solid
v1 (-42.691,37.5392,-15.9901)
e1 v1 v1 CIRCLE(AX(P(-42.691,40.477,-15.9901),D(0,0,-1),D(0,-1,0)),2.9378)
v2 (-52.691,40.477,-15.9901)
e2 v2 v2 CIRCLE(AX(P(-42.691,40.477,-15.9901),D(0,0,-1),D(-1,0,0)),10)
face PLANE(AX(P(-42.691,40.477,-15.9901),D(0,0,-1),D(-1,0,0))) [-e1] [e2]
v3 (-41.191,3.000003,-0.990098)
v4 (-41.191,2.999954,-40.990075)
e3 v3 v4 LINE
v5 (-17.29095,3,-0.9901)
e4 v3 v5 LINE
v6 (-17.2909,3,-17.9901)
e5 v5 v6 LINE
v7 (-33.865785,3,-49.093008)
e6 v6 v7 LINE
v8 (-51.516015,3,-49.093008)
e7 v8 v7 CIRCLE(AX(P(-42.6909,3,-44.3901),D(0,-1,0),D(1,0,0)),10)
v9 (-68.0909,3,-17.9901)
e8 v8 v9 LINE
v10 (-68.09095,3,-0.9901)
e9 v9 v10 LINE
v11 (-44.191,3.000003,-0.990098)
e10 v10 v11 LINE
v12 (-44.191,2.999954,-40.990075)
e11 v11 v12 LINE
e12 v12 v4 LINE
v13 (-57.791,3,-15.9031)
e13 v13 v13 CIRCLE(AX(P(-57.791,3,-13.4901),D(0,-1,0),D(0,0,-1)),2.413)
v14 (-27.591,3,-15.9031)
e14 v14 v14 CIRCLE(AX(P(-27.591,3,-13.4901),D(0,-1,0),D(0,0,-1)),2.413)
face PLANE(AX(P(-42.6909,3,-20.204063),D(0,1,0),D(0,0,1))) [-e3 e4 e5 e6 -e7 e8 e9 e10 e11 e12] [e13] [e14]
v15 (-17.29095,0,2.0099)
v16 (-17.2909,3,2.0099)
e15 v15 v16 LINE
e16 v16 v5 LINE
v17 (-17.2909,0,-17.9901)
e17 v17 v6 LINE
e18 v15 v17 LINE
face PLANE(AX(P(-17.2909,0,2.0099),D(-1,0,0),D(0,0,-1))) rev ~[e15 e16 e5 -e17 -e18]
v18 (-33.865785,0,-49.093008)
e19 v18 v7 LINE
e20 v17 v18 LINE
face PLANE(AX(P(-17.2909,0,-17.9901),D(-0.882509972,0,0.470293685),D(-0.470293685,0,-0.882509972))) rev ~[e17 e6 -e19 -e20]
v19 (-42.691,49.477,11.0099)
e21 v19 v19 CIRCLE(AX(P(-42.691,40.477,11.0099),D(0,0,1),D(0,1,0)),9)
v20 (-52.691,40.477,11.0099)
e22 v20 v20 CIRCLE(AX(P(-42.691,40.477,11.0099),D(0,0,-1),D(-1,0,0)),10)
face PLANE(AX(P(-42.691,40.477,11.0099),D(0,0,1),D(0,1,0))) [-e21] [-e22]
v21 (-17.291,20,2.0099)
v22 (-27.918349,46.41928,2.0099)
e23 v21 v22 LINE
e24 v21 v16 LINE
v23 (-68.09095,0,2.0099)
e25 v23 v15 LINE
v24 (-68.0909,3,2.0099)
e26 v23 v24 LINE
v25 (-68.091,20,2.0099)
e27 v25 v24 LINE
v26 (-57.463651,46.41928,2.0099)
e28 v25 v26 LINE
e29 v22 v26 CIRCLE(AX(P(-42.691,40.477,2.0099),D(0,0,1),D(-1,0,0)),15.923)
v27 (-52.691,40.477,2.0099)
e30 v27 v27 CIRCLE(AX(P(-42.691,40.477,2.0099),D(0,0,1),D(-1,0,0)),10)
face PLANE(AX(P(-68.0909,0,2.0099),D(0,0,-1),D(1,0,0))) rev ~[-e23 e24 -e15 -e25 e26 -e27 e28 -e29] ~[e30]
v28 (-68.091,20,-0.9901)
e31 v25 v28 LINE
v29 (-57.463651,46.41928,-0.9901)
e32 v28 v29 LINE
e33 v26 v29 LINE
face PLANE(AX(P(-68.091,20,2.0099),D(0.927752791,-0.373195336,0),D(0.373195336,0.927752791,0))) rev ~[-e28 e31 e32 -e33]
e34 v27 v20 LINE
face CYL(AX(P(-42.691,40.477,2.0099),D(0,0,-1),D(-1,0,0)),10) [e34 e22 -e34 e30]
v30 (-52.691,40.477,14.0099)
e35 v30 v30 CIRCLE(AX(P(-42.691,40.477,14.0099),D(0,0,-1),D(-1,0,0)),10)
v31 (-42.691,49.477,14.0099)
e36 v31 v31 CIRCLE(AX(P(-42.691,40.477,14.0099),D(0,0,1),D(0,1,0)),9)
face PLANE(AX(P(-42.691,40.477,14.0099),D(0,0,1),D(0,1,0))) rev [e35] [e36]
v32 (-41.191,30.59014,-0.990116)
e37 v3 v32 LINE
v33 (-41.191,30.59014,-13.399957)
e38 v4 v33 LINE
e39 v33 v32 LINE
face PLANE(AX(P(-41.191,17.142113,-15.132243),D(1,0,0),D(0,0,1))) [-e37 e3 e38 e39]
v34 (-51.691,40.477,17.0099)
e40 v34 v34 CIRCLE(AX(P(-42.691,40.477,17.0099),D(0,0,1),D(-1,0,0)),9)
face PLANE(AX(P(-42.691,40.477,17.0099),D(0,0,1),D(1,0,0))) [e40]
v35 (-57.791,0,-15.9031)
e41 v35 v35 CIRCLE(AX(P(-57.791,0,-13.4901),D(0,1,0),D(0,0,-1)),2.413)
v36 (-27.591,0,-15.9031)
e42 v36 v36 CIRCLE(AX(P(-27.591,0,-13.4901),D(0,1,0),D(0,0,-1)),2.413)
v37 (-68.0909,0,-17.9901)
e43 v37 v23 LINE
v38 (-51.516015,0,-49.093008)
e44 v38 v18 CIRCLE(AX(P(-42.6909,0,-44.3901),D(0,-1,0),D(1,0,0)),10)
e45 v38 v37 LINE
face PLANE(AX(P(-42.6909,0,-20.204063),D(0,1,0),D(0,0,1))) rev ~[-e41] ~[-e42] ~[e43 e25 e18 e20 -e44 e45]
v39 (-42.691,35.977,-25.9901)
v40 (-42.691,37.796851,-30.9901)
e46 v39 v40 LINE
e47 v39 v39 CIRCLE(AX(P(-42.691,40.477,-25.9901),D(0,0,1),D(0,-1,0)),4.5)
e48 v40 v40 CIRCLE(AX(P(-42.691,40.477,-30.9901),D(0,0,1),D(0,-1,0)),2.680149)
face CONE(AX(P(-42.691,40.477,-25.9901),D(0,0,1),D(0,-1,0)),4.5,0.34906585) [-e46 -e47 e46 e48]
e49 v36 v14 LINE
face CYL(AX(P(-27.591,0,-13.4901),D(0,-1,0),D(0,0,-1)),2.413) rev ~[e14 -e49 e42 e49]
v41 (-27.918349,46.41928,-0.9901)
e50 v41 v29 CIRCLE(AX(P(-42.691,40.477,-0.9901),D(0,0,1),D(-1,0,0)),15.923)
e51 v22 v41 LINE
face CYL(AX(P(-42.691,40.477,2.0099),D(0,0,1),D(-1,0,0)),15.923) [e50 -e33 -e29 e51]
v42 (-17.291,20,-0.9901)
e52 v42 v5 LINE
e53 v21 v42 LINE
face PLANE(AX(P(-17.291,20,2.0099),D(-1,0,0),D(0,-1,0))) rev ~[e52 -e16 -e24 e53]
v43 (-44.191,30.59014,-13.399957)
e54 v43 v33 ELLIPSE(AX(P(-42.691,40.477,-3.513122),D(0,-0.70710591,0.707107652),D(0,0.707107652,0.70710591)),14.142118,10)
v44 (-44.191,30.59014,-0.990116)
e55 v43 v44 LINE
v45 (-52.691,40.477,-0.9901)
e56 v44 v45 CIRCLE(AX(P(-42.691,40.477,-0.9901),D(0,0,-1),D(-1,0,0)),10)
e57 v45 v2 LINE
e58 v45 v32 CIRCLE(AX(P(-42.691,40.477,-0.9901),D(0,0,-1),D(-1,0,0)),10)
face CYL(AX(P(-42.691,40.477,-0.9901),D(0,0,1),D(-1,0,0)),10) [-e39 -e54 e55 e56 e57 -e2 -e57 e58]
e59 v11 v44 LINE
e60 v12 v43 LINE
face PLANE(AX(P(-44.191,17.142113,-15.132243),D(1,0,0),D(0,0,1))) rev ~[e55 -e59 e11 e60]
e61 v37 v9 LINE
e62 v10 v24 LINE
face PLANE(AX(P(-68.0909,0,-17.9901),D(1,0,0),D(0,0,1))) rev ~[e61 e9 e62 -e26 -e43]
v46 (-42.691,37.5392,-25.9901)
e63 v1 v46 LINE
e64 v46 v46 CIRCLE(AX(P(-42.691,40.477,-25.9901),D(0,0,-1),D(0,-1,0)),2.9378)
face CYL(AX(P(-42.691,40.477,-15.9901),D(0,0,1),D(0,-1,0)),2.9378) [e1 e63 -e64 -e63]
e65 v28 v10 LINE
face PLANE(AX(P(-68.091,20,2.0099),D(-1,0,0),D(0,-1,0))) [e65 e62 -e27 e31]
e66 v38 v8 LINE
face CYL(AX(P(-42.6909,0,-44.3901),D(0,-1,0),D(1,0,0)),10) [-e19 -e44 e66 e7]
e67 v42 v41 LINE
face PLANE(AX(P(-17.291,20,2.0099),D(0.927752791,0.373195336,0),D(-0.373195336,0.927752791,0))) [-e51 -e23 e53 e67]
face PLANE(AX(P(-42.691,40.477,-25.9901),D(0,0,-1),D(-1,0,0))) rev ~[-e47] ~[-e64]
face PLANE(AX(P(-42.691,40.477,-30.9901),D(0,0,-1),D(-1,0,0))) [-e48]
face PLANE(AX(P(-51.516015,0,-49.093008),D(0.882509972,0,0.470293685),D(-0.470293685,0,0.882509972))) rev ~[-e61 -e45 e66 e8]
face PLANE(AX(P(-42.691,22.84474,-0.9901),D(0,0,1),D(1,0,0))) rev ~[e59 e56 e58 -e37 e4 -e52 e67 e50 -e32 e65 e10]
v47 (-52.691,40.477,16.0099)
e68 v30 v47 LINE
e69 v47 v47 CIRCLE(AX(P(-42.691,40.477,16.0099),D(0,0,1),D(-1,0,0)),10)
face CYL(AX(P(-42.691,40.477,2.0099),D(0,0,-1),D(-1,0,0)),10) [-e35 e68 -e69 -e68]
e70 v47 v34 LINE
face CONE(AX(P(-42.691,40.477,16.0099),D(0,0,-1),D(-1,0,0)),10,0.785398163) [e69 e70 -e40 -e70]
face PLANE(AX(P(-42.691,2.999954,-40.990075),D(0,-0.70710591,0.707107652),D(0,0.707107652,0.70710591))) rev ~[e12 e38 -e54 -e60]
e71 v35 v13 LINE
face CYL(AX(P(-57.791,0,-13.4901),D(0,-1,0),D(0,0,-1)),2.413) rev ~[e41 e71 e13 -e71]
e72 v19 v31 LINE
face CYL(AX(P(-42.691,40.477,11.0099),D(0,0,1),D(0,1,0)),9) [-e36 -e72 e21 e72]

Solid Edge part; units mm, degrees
sketch "Sketch1" plane through (10.8674, 0, 10.8674) normal (0, -1, 0) x (1, 0, 0)
  line L0 (-78.9583, -8.8575) -> (-28.1583, -8.8575)
  line L1 (-28.1583, -8.8575) -> (-28.1583, -28.8575)
  line L2 (-28.1583, -28.8575) -> (-44.7332, -59.9604)
  arc A0 (-62.3834, -59.9604) -> (-44.7332, -59.9604) centre (-53.5583, -55.2575) ccw
  line L3 (-62.3834, -59.9604) -> (-78.9583, -28.8575)
  line L4 (-78.9583, -28.8575) -> (-78.9583, -8.8575)
  dimension "D1" = 50.8
  dimension "D2" = 20
  dimension "D3" = 10
  dimension "D4" = 56.4
extrude "Protrusion1" add sketch "Sketch1" against normal blind 3
sketch "Sketch2" plane through (-42.691, 1.5, 2.0099) normal (0, 0, 1) x (-1, 0, 0)
  line L0 (25.4, 1.5) -> (-25.4, 1.5)
  line L1 (-25.4, -18.5) -> (-25.4, 1.5)
  line L2 (-25.4, -18.5) -> (-14.7727, -44.9193)
  line L3 (25.4, -18.5) -> (14.7727, -44.9193)
  line L4 (25.4, -18.5) -> (25.4, 1.5)
  arc A0 (-14.7727, -44.9193) -> (14.7727, -44.9193) centre (0, -38.977) ccw
  dimension "D1" = 56.4
  dimension "D2" = 20
extrude "Horizontal" add sketch "Sketch2" against normal blind 3
sketch "Sketch3" plane through (-42.691, 56.4, 2.0099) normal (1, 0, 0) x (0, -0.9984256, -0.0560913)
  line L0 (53.4842, 0) -> (55.7279, 39.937)
  line L1 (55.7279, 39.937) -> (13.5472, 2.2437)
  line L2 (53.4842, 0) -> (13.5472, 2.2437)
  dimension "D1" = 40
extrude "Support" add sketch "Sketch3" along normal mid plane 3
sketch "Sketch4" plane through (-42.691, 29.7, -0.9901) normal (0, 0, -1) x (-1, 0, 0)
  circle A0 centre (0, 10.777) radius 10
extrude "Outlet" add sketch "Sketch4" along normal blind 15
sketch "Sketch5" plane through (-42.691, 40.477, -15.9901) normal (0, 0, -1) x (0, -1, 0)
  circle A0 centre (0, 0) radius 2.9378
extrude "OutletThin" add sketch "Sketch5" along normal blind 10
sketch "Sketch6" plane through (-42.691, 40.477, -25.9901) normal (0, 0, -1) x (0, -1, 0)
  circle A0 centre (0, 0) radius 4.5
extrude "OutletValve" add sketch "Sketch6" along normal blind 5 draft 20
sketch "Sketch7" plane through (-42.691, 28.2, 2.0099) normal (0, 0, 1) x (-1, 0, 0)
  circle A0 centre (0, -12.277) radius 10
extrude "Inlet" add sketch "Sketch7" along normal blind 15
sketch "Sketch8" plane through (-42.691, 30.477, 17.0099) normal (-1, 0, 0) x (0, 1, 0)
  line L0 (19, 3) -> (22, 3)
  line L1 (22, 3) -> (22, 6)
  line L2 (22, 6) -> (19, 6)
  line L3 (19, 6) -> (19, 3)
  dimension "D1" = 3
  dimension "D2" = 3
  dimension "D3" = 3
revolve "RevolvedCutout1" cut sketch "Sketch8" angle 360 about axis through (-42.691, 40.477, -30.9901) along (0, 0, 1)
chamfer "InletChamfer" distance 1 angle 45 1 edges at (-32.691, 40.477, 17.0099)
hole "Hole1" at (-57.791, 0, -13.4901) direction (0, 1, 0) diameter 4.826 end up to next
hole "Hole2" at (-27.591, 0, -13.4901) direction (0, 1, 0) diameter 4.826 end up to next
